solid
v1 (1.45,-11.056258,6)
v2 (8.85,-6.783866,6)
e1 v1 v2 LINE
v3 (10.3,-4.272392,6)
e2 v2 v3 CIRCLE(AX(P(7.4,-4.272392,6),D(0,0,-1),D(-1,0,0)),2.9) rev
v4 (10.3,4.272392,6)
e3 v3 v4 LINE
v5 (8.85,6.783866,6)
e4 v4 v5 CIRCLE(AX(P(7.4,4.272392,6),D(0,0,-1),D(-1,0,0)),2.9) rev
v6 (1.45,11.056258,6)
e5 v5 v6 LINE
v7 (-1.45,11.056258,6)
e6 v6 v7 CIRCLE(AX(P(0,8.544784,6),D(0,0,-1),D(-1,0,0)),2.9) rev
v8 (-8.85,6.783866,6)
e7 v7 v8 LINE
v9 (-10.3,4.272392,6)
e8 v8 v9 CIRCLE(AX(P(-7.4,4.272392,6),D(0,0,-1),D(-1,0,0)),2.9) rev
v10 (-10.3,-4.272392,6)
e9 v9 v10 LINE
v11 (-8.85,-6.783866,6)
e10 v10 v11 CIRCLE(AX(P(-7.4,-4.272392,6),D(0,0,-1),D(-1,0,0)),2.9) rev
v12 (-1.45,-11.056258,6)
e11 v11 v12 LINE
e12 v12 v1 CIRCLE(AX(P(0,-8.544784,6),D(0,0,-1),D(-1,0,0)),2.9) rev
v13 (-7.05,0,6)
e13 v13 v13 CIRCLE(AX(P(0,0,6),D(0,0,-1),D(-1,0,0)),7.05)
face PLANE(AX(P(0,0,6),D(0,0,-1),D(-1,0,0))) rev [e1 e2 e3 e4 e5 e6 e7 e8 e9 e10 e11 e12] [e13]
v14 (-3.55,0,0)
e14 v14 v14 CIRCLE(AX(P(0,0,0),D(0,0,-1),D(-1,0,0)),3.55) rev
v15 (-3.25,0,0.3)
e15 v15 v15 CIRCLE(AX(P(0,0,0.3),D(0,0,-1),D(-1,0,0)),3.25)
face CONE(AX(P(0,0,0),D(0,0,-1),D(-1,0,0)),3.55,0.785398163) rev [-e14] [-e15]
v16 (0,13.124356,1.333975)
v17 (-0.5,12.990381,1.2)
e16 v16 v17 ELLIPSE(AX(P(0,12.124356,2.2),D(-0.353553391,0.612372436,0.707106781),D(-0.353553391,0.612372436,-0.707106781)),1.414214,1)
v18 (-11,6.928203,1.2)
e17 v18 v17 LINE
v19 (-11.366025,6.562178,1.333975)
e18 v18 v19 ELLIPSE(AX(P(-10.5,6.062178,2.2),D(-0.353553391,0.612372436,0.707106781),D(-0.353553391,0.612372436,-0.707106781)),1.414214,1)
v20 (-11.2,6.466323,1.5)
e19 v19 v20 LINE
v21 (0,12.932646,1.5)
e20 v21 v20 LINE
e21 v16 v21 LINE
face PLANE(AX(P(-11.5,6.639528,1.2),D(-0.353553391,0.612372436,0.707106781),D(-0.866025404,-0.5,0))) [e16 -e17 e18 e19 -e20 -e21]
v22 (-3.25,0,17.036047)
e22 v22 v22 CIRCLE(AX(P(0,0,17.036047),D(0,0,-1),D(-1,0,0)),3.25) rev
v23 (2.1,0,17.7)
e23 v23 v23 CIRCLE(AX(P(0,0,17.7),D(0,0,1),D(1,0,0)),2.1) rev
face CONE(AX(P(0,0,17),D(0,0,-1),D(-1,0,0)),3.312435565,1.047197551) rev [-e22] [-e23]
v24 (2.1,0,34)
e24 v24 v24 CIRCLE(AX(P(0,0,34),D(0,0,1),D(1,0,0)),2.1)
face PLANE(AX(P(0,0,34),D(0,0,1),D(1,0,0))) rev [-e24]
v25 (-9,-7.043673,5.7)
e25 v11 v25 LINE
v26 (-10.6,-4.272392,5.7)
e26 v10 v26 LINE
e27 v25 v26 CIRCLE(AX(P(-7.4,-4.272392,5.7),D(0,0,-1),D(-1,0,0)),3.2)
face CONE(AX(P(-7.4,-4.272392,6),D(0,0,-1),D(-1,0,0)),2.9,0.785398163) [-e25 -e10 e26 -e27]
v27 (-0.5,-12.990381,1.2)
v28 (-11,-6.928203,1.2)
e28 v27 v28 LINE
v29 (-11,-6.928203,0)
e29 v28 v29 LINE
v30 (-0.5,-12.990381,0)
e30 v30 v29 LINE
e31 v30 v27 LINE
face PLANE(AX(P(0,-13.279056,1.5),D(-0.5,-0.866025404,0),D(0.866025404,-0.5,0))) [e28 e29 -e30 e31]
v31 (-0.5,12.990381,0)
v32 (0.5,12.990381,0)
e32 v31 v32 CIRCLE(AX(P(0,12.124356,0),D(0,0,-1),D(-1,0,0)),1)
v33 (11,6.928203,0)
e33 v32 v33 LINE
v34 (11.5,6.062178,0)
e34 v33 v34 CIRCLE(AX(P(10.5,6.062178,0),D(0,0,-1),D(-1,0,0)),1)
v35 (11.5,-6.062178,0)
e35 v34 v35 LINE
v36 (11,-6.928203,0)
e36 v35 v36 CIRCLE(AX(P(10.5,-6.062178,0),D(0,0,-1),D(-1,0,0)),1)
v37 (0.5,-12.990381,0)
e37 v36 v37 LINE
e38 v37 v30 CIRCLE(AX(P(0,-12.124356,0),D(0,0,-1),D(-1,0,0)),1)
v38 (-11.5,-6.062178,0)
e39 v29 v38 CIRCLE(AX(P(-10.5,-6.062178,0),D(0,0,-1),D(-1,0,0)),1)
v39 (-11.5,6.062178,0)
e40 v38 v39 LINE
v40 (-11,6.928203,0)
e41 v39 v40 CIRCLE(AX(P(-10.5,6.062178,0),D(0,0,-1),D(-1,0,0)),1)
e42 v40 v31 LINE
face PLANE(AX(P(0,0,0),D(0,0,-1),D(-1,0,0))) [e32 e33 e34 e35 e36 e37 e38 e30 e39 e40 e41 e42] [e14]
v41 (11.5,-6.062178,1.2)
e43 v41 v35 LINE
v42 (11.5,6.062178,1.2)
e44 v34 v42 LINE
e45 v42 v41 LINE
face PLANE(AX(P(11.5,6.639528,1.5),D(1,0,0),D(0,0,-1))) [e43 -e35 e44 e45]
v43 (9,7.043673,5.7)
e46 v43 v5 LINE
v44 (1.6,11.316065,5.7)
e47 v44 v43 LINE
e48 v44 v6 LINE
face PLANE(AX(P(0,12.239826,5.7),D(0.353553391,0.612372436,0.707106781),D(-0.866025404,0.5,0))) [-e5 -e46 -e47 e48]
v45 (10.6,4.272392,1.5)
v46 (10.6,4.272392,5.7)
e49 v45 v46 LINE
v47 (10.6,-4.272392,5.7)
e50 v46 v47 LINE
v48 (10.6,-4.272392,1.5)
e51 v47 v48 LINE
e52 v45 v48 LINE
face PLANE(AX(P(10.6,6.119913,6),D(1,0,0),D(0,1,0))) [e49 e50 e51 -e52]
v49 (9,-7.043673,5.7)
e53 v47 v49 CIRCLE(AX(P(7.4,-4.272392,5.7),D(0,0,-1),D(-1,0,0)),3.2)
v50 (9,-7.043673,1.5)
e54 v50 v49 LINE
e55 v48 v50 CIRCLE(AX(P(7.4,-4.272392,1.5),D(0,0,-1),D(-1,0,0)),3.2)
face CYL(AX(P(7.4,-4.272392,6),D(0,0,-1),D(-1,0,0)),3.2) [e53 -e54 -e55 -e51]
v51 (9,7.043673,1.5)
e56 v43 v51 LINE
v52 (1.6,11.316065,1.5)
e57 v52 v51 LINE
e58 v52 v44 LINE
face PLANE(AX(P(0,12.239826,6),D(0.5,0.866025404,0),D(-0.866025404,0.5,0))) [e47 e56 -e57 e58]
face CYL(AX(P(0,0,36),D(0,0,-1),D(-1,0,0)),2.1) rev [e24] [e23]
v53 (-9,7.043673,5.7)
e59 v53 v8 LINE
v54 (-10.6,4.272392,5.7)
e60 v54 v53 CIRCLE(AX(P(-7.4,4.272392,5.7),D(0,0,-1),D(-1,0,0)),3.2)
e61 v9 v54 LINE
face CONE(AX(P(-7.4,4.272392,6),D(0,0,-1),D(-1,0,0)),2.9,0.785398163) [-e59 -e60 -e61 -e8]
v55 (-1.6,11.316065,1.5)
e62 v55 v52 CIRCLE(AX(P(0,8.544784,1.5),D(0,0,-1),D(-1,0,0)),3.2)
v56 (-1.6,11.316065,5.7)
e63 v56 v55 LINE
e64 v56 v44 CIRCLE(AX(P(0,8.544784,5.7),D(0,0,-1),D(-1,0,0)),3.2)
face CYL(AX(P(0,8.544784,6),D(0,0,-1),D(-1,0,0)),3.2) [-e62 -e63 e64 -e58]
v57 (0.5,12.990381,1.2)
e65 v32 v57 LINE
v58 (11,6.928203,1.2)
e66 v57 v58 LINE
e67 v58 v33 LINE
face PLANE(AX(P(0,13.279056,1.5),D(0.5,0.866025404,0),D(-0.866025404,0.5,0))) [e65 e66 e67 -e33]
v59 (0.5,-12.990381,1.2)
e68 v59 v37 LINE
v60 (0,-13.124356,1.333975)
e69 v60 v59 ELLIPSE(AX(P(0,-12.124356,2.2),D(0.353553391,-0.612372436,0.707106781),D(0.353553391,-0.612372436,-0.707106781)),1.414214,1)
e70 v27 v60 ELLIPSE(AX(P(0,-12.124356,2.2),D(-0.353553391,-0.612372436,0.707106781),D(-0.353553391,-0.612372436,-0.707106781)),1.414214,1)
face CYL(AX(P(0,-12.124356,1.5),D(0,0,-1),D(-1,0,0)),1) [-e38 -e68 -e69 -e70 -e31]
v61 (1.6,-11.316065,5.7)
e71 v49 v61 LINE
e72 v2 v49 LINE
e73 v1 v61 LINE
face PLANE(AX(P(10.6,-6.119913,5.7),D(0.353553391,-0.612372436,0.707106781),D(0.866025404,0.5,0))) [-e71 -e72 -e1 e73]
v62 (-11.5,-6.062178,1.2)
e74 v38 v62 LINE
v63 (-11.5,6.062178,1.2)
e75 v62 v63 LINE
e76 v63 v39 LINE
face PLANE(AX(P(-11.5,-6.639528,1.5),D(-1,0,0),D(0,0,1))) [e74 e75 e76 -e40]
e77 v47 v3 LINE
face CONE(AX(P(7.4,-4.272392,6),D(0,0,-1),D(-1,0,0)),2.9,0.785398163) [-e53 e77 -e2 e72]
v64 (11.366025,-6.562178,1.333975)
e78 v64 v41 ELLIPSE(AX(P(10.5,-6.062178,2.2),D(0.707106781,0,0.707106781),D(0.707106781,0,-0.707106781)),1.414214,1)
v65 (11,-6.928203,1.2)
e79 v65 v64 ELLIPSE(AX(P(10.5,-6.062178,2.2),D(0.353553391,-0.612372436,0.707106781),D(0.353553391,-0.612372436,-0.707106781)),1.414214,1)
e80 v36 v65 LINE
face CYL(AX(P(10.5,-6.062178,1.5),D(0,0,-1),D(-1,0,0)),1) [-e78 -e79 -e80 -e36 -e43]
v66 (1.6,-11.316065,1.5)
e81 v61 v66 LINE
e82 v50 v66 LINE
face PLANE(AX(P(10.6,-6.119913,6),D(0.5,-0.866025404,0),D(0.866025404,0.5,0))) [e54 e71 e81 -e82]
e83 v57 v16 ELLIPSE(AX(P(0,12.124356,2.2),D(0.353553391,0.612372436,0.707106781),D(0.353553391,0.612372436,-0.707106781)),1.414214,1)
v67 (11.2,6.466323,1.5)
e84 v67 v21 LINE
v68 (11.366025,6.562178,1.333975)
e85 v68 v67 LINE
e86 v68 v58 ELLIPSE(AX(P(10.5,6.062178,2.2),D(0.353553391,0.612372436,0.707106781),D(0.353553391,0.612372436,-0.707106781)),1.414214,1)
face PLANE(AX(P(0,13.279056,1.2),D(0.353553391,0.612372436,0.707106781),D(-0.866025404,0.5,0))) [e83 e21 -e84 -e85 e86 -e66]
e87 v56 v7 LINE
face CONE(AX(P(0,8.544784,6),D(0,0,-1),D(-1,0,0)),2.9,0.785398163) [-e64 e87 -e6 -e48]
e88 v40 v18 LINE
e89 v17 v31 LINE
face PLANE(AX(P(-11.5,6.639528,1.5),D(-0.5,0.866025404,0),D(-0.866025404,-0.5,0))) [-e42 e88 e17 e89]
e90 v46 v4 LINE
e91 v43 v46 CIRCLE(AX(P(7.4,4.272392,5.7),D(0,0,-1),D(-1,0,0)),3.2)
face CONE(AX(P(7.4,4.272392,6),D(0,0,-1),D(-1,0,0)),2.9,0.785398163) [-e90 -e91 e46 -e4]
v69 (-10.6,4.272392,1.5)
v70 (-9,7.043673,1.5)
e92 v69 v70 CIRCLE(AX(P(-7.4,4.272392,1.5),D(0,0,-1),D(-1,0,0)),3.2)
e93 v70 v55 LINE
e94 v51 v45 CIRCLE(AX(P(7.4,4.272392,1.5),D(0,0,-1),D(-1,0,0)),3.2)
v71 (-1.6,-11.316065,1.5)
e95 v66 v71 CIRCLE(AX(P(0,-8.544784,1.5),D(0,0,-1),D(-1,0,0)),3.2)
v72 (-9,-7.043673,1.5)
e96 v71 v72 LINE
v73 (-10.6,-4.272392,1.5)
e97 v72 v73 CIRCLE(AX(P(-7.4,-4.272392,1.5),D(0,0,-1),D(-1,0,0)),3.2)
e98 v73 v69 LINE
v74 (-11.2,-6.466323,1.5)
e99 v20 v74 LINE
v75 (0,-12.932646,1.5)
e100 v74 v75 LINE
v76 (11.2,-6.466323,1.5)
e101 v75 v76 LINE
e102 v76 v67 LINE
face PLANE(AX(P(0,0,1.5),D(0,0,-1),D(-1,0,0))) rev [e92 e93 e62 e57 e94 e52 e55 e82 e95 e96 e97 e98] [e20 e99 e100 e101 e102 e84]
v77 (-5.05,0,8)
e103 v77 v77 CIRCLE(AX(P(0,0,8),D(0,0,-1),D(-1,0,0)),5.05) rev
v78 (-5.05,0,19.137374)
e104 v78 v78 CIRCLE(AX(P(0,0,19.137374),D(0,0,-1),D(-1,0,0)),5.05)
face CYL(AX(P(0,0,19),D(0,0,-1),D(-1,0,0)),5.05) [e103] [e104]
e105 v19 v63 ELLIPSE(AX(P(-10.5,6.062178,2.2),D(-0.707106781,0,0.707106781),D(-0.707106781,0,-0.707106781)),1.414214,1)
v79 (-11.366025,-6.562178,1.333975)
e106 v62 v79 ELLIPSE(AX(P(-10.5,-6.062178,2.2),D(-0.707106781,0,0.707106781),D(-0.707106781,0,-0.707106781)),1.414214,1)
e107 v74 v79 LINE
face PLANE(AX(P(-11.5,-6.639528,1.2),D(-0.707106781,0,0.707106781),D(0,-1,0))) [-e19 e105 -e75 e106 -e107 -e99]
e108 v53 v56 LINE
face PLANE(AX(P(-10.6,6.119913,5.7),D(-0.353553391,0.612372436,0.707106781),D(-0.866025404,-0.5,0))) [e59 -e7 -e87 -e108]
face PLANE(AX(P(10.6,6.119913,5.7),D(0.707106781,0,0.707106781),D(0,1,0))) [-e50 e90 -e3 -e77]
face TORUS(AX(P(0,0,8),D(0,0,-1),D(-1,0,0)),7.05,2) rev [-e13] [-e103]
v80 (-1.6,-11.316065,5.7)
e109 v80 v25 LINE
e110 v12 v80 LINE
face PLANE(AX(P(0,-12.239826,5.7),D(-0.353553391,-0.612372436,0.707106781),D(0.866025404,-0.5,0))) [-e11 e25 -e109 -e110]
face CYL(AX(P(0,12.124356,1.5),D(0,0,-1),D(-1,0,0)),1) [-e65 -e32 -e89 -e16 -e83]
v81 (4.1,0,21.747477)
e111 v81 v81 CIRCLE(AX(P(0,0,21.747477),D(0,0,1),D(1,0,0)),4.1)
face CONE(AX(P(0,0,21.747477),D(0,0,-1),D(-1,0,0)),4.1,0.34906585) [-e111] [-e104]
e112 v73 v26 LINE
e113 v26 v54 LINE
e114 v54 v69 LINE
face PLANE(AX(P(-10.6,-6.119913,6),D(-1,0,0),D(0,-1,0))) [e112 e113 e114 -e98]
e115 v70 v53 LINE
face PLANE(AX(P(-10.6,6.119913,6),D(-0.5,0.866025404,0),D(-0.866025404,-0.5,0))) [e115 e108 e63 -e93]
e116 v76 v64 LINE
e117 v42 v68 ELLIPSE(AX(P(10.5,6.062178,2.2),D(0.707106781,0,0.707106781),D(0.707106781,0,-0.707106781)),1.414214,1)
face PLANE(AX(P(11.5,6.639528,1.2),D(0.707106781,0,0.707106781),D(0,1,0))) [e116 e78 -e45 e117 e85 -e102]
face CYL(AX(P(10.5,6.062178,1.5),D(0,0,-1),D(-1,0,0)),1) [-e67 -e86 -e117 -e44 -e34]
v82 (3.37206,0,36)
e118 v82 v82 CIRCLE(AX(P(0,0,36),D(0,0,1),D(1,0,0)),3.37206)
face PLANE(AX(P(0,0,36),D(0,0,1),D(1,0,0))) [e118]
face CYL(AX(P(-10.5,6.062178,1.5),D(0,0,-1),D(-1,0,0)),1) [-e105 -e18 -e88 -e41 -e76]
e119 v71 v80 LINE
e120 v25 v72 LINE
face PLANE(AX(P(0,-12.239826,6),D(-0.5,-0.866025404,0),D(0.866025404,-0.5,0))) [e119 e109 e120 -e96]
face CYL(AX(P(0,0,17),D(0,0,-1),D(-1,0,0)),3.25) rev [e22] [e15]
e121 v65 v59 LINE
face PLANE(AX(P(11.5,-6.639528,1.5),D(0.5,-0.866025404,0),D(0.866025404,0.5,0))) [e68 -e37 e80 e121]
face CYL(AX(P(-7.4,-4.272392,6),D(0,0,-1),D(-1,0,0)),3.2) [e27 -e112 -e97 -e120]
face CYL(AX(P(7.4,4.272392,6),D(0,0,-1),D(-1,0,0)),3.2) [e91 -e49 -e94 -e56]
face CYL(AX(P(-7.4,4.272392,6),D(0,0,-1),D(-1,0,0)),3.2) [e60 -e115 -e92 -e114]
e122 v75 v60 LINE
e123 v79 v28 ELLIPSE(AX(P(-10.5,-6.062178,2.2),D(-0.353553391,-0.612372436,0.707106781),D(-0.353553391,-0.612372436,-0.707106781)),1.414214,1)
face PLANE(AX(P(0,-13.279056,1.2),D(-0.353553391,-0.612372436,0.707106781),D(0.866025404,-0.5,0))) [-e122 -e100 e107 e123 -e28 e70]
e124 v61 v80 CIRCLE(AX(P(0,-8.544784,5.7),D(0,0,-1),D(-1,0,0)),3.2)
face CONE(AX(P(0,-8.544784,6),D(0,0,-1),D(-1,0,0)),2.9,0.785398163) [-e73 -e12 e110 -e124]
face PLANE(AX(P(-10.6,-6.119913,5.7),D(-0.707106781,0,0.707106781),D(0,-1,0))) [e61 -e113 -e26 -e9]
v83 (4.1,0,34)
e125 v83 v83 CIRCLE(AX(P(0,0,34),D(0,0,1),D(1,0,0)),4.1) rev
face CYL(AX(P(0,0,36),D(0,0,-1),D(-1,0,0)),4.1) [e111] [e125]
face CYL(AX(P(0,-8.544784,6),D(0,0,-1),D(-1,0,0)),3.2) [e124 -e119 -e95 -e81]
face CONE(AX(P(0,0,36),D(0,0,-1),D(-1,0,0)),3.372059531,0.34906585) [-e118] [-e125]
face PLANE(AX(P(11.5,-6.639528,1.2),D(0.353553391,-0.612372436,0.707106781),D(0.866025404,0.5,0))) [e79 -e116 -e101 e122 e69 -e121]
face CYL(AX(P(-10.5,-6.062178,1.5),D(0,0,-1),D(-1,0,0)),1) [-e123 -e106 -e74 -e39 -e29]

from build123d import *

# Parameters (mm, degrees)
BOSS_EXTRUDE1_DEPTH  = 1.5
SKETCH1_8_R          = 4.1
BOSS_EXTRUDE3_DEPTH  = 36
SKETCH1_9_R          = 5.05
BOSS_EXTRUDE4_DEPTH  = 19
SHELL1_START         = 2
SHELL1_OUTLINE_R     = 2.1
SHELL1_DEPTH         = 32
SHELL1_2_OUTLINE_R   = 3.05
SHELL1_2_OUTLINE_R_2 = 2.1
SHELL1_2_DEPTH       = 15
SKETCH1_10_R         = 3.25
CUT_EXTRUDE1_DEPTH   = 17
SKETCH1_3_R          = 3.25
BOSS_EXTRUDE2_DEPTH  = 6
CHAMFER1_SIZE        = 2
CHAMFER1_SIZE2       = 0.727940469
CHAMFER2_SIZE        = 2.747477419
CHAMFER2_SIZE_2      = 1
CHAMFER3_SIZE        = 1.212435565
CHAMFER3_SIZE_2      = 0.7
CHAMFER6_SIZE        = 0.3
FILLET1_R            = 3.2
CHAMFER5_SIZE        = 0.3
FILLET2_R            = 1
FILLET3_R            = 2


# Read off the part's stored shape, not the designer's step: Shell1
with BuildPart() as part:
    # Sketch1 → Boss-Extrude1 (new body)
    with BuildSketch(Plane.XY):
        Polygon((-11.5, 6.639528096), (0, 13.279056191), (11.5, 6.639528096), (11.5, -6.639528096), (0, -13.279056191), (-11.5, -6.639528096), align=None)
    extrude(amount=BOSS_EXTRUDE1_DEPTH)

    # Sketch1<8> → Boss-Extrude3 (add)
    with BuildSketch(Plane.XY):
        with Locations(Location((0, 0, 0), (0, 0, 180))):
            Circle(SKETCH1_8_R)
    extrude(amount=BOSS_EXTRUDE3_DEPTH)

    # Sketch1<9> → Boss-Extrude4 (add)
    with BuildSketch(Plane.XY):
        with Locations(Location((0, 0, 0), (0, 0, 180))):
            Circle(SKETCH1_9_R)
    extrude(amount=BOSS_EXTRUDE4_DEPTH)

    # Shell1 outline → Shell1 (cut)
    with BuildSketch(Plane.XY.offset(SHELL1_START)):
        Circle(SHELL1_OUTLINE_R)
    extrude(amount=SHELL1_DEPTH, mode=Mode.SUBTRACT)

    # Shell1 2 outline → Shell1 2 (cut)
    with BuildSketch(Plane.XY.offset(SHELL1_START)):
        Circle(SHELL1_2_OUTLINE_R)
        Circle(SHELL1_2_OUTLINE_R_2, mode=Mode.SUBTRACT)
    extrude(amount=SHELL1_2_DEPTH, mode=Mode.SUBTRACT)

    # Sketch1<10> → Cut-Extrude1 (cut)
    with BuildSketch(Plane.XY):
        Circle(SKETCH1_10_R)
    extrude(amount=CUT_EXTRUDE1_DEPTH, mode=Mode.SUBTRACT)

    # Sketch1<3> → Boss-Extrude2 (add)
    with BuildSketch(Plane.XY):
        Polygon((0, 12.239825707), (10.6, 6.119912853), (10.6, -6.119912853), (0, -12.239825707), (-10.6, -6.119912853), (-10.6, 6.119912853), align=None)
        Circle(SKETCH1_3_R, mode=Mode.SUBTRACT)
    extrude(amount=BOSS_EXTRUDE2_DEPTH)

    # Chamfer1
    chamfer1_edges = [part.edges().sort_by_distance(p)[0] for p in [
        (4.1, 0, 36),
    ]]
    chamfer1_side = [part.faces().sort_by_distance(p)[0] for p in [
        (4.1, 0, 27.5),
    ]]
    chamfer(chamfer1_edges, length=CHAMFER1_SIZE, length2=CHAMFER1_SIZE2, reference=chamfer1_side[0])

    # Chamfer2
    # the kernel refuses this chamfer: 2.747477419, 1 mm, written as the material it adds along each edge
    with BuildSketch(Plane(origin=(0, 0, 19), x_dir=(-1, 0, 0), z_dir=(0, -1, 0))) as chamfer2_piece_1_section:
        Polygon((4.1, -CHAMFER2_SIZE), (4.1 + CHAMFER2_SIZE_2, 0), (4.1, 0), align=None)
    chamfer2_piece_1 = revolve(axis=Axis((0, 0, 19), (0, 0, -1)), mode=Mode.PRIVATE)
    chamfer2_piece_1 = chamfer2_piece_1 & Plane(origin=(0, 0, 20.481947897), x_dir=(-1, 0, 0), z_dir=(0, 0, -1)) * Cylinder(5.05, 21, mode=Mode.PRIVATE)
    add(chamfer2_piece_1)

    # Chamfer3
    # the kernel refuses this chamfer: 1.212435565, 0.7 mm, written as the material it takes off along each edge
    with BuildSketch(Plane(origin=(0, 0, 17), x_dir=(1, 0, 0), z_dir=(0, -1, 0))) as chamfer3_piece_1_section:
        Polygon((2.1 + CHAMFER3_SIZE, 0), (2.1, CHAMFER3_SIZE_2), (2.1, 0), align=None)
    chamfer3_piece_1 = revolve(axis=Axis((0, 0, 17), (0, 0, 1)), mode=Mode.PRIVATE)
    chamfer3_piece_1 = chamfer3_piece_1 & Plane(origin=(0, 0, 17.363214185), x_dir=(1, 0, 0), z_dir=(0, 0, -1)) * Cylinder(3.25, 14, mode=Mode.PRIVATE)
    add(chamfer3_piece_1, mode=Mode.SUBTRACT)

    # Chamfer6
    chamfer6_edges = [part.edges().sort_by_distance(p)[0] for p in [
        (-3.25, 0, 0),
    ]]
    chamfer(chamfer6_edges, length=CHAMFER6_SIZE)

    # Fillet1
    fillet1_edges = [part.edges().sort_by_distance(p)[0] for p in [
        (-10.6, -6.119912853, 3.75),
        (0, -12.239825707, 3.75),
        (10.6, -6.119912853, 3.75),
        (10.6, 6.119912853, 3.75),
        (0, 12.239825707, 3.75),
        (-10.6, 6.119912853, 3.75),
    ]]
    fillet(fillet1_edges, radius=FILLET1_R)

    # Chamfer5
    chamfer5_edges = [part.edges().sort_by_distance(p)[0] for p in [
        (-5.3, -9.17986928, 6),
        (5.3, 9.17986928, 6),
        (-5.3, 9.17986928, 6),
        (-10.6, 0, 6),
        (10.171281292, 5.872391992, 6),
        (0, 11.744783984, 6),
        (-10.171281292, 5.872391992, 6),
        (-10.171281292, -5.872391992, 6),
        (0, -11.744783984, 6),
        (10.171281292, -5.872391992, 6),
        (5.75, 9.959292144, 1.5),
        (11.5, 0, 1.5),
        (5.75, -9.959292144, 1.5),
        (-5.75, -9.959292144, 1.5),
        (-11.5, 0, 1.5),
        (-5.75, 9.959292144, 1.5),
        (10.6, 0, 6),
        (5.3, -9.17986928, 6),
    ]]
    chamfer(chamfer5_edges, length=CHAMFER5_SIZE)

    # Fillet2
    fillet2_edges = [part.edges().sort_by_distance(p)[0] for p in [
        (11.5, 6.639528096, 0.6),
        (11.5, -6.639528096, 0.6),
        (0, -13.279056191, 0.6),
        (-11.5, -6.639528096, 0.6),
        (-11.5, 6.639528096, 0.6),
        (0, 13.279056191, 0.6),
    ]]
    fillet(fillet2_edges, radius=FILLET2_R)

    # Fillet3
    fillet3_edges = [part.edges().sort_by_distance(p)[0] for p in [
        (5.05, 0, 6),
    ]]
    fillet(fillet3_edges, radius=FILLET3_R)


solid = part.part
